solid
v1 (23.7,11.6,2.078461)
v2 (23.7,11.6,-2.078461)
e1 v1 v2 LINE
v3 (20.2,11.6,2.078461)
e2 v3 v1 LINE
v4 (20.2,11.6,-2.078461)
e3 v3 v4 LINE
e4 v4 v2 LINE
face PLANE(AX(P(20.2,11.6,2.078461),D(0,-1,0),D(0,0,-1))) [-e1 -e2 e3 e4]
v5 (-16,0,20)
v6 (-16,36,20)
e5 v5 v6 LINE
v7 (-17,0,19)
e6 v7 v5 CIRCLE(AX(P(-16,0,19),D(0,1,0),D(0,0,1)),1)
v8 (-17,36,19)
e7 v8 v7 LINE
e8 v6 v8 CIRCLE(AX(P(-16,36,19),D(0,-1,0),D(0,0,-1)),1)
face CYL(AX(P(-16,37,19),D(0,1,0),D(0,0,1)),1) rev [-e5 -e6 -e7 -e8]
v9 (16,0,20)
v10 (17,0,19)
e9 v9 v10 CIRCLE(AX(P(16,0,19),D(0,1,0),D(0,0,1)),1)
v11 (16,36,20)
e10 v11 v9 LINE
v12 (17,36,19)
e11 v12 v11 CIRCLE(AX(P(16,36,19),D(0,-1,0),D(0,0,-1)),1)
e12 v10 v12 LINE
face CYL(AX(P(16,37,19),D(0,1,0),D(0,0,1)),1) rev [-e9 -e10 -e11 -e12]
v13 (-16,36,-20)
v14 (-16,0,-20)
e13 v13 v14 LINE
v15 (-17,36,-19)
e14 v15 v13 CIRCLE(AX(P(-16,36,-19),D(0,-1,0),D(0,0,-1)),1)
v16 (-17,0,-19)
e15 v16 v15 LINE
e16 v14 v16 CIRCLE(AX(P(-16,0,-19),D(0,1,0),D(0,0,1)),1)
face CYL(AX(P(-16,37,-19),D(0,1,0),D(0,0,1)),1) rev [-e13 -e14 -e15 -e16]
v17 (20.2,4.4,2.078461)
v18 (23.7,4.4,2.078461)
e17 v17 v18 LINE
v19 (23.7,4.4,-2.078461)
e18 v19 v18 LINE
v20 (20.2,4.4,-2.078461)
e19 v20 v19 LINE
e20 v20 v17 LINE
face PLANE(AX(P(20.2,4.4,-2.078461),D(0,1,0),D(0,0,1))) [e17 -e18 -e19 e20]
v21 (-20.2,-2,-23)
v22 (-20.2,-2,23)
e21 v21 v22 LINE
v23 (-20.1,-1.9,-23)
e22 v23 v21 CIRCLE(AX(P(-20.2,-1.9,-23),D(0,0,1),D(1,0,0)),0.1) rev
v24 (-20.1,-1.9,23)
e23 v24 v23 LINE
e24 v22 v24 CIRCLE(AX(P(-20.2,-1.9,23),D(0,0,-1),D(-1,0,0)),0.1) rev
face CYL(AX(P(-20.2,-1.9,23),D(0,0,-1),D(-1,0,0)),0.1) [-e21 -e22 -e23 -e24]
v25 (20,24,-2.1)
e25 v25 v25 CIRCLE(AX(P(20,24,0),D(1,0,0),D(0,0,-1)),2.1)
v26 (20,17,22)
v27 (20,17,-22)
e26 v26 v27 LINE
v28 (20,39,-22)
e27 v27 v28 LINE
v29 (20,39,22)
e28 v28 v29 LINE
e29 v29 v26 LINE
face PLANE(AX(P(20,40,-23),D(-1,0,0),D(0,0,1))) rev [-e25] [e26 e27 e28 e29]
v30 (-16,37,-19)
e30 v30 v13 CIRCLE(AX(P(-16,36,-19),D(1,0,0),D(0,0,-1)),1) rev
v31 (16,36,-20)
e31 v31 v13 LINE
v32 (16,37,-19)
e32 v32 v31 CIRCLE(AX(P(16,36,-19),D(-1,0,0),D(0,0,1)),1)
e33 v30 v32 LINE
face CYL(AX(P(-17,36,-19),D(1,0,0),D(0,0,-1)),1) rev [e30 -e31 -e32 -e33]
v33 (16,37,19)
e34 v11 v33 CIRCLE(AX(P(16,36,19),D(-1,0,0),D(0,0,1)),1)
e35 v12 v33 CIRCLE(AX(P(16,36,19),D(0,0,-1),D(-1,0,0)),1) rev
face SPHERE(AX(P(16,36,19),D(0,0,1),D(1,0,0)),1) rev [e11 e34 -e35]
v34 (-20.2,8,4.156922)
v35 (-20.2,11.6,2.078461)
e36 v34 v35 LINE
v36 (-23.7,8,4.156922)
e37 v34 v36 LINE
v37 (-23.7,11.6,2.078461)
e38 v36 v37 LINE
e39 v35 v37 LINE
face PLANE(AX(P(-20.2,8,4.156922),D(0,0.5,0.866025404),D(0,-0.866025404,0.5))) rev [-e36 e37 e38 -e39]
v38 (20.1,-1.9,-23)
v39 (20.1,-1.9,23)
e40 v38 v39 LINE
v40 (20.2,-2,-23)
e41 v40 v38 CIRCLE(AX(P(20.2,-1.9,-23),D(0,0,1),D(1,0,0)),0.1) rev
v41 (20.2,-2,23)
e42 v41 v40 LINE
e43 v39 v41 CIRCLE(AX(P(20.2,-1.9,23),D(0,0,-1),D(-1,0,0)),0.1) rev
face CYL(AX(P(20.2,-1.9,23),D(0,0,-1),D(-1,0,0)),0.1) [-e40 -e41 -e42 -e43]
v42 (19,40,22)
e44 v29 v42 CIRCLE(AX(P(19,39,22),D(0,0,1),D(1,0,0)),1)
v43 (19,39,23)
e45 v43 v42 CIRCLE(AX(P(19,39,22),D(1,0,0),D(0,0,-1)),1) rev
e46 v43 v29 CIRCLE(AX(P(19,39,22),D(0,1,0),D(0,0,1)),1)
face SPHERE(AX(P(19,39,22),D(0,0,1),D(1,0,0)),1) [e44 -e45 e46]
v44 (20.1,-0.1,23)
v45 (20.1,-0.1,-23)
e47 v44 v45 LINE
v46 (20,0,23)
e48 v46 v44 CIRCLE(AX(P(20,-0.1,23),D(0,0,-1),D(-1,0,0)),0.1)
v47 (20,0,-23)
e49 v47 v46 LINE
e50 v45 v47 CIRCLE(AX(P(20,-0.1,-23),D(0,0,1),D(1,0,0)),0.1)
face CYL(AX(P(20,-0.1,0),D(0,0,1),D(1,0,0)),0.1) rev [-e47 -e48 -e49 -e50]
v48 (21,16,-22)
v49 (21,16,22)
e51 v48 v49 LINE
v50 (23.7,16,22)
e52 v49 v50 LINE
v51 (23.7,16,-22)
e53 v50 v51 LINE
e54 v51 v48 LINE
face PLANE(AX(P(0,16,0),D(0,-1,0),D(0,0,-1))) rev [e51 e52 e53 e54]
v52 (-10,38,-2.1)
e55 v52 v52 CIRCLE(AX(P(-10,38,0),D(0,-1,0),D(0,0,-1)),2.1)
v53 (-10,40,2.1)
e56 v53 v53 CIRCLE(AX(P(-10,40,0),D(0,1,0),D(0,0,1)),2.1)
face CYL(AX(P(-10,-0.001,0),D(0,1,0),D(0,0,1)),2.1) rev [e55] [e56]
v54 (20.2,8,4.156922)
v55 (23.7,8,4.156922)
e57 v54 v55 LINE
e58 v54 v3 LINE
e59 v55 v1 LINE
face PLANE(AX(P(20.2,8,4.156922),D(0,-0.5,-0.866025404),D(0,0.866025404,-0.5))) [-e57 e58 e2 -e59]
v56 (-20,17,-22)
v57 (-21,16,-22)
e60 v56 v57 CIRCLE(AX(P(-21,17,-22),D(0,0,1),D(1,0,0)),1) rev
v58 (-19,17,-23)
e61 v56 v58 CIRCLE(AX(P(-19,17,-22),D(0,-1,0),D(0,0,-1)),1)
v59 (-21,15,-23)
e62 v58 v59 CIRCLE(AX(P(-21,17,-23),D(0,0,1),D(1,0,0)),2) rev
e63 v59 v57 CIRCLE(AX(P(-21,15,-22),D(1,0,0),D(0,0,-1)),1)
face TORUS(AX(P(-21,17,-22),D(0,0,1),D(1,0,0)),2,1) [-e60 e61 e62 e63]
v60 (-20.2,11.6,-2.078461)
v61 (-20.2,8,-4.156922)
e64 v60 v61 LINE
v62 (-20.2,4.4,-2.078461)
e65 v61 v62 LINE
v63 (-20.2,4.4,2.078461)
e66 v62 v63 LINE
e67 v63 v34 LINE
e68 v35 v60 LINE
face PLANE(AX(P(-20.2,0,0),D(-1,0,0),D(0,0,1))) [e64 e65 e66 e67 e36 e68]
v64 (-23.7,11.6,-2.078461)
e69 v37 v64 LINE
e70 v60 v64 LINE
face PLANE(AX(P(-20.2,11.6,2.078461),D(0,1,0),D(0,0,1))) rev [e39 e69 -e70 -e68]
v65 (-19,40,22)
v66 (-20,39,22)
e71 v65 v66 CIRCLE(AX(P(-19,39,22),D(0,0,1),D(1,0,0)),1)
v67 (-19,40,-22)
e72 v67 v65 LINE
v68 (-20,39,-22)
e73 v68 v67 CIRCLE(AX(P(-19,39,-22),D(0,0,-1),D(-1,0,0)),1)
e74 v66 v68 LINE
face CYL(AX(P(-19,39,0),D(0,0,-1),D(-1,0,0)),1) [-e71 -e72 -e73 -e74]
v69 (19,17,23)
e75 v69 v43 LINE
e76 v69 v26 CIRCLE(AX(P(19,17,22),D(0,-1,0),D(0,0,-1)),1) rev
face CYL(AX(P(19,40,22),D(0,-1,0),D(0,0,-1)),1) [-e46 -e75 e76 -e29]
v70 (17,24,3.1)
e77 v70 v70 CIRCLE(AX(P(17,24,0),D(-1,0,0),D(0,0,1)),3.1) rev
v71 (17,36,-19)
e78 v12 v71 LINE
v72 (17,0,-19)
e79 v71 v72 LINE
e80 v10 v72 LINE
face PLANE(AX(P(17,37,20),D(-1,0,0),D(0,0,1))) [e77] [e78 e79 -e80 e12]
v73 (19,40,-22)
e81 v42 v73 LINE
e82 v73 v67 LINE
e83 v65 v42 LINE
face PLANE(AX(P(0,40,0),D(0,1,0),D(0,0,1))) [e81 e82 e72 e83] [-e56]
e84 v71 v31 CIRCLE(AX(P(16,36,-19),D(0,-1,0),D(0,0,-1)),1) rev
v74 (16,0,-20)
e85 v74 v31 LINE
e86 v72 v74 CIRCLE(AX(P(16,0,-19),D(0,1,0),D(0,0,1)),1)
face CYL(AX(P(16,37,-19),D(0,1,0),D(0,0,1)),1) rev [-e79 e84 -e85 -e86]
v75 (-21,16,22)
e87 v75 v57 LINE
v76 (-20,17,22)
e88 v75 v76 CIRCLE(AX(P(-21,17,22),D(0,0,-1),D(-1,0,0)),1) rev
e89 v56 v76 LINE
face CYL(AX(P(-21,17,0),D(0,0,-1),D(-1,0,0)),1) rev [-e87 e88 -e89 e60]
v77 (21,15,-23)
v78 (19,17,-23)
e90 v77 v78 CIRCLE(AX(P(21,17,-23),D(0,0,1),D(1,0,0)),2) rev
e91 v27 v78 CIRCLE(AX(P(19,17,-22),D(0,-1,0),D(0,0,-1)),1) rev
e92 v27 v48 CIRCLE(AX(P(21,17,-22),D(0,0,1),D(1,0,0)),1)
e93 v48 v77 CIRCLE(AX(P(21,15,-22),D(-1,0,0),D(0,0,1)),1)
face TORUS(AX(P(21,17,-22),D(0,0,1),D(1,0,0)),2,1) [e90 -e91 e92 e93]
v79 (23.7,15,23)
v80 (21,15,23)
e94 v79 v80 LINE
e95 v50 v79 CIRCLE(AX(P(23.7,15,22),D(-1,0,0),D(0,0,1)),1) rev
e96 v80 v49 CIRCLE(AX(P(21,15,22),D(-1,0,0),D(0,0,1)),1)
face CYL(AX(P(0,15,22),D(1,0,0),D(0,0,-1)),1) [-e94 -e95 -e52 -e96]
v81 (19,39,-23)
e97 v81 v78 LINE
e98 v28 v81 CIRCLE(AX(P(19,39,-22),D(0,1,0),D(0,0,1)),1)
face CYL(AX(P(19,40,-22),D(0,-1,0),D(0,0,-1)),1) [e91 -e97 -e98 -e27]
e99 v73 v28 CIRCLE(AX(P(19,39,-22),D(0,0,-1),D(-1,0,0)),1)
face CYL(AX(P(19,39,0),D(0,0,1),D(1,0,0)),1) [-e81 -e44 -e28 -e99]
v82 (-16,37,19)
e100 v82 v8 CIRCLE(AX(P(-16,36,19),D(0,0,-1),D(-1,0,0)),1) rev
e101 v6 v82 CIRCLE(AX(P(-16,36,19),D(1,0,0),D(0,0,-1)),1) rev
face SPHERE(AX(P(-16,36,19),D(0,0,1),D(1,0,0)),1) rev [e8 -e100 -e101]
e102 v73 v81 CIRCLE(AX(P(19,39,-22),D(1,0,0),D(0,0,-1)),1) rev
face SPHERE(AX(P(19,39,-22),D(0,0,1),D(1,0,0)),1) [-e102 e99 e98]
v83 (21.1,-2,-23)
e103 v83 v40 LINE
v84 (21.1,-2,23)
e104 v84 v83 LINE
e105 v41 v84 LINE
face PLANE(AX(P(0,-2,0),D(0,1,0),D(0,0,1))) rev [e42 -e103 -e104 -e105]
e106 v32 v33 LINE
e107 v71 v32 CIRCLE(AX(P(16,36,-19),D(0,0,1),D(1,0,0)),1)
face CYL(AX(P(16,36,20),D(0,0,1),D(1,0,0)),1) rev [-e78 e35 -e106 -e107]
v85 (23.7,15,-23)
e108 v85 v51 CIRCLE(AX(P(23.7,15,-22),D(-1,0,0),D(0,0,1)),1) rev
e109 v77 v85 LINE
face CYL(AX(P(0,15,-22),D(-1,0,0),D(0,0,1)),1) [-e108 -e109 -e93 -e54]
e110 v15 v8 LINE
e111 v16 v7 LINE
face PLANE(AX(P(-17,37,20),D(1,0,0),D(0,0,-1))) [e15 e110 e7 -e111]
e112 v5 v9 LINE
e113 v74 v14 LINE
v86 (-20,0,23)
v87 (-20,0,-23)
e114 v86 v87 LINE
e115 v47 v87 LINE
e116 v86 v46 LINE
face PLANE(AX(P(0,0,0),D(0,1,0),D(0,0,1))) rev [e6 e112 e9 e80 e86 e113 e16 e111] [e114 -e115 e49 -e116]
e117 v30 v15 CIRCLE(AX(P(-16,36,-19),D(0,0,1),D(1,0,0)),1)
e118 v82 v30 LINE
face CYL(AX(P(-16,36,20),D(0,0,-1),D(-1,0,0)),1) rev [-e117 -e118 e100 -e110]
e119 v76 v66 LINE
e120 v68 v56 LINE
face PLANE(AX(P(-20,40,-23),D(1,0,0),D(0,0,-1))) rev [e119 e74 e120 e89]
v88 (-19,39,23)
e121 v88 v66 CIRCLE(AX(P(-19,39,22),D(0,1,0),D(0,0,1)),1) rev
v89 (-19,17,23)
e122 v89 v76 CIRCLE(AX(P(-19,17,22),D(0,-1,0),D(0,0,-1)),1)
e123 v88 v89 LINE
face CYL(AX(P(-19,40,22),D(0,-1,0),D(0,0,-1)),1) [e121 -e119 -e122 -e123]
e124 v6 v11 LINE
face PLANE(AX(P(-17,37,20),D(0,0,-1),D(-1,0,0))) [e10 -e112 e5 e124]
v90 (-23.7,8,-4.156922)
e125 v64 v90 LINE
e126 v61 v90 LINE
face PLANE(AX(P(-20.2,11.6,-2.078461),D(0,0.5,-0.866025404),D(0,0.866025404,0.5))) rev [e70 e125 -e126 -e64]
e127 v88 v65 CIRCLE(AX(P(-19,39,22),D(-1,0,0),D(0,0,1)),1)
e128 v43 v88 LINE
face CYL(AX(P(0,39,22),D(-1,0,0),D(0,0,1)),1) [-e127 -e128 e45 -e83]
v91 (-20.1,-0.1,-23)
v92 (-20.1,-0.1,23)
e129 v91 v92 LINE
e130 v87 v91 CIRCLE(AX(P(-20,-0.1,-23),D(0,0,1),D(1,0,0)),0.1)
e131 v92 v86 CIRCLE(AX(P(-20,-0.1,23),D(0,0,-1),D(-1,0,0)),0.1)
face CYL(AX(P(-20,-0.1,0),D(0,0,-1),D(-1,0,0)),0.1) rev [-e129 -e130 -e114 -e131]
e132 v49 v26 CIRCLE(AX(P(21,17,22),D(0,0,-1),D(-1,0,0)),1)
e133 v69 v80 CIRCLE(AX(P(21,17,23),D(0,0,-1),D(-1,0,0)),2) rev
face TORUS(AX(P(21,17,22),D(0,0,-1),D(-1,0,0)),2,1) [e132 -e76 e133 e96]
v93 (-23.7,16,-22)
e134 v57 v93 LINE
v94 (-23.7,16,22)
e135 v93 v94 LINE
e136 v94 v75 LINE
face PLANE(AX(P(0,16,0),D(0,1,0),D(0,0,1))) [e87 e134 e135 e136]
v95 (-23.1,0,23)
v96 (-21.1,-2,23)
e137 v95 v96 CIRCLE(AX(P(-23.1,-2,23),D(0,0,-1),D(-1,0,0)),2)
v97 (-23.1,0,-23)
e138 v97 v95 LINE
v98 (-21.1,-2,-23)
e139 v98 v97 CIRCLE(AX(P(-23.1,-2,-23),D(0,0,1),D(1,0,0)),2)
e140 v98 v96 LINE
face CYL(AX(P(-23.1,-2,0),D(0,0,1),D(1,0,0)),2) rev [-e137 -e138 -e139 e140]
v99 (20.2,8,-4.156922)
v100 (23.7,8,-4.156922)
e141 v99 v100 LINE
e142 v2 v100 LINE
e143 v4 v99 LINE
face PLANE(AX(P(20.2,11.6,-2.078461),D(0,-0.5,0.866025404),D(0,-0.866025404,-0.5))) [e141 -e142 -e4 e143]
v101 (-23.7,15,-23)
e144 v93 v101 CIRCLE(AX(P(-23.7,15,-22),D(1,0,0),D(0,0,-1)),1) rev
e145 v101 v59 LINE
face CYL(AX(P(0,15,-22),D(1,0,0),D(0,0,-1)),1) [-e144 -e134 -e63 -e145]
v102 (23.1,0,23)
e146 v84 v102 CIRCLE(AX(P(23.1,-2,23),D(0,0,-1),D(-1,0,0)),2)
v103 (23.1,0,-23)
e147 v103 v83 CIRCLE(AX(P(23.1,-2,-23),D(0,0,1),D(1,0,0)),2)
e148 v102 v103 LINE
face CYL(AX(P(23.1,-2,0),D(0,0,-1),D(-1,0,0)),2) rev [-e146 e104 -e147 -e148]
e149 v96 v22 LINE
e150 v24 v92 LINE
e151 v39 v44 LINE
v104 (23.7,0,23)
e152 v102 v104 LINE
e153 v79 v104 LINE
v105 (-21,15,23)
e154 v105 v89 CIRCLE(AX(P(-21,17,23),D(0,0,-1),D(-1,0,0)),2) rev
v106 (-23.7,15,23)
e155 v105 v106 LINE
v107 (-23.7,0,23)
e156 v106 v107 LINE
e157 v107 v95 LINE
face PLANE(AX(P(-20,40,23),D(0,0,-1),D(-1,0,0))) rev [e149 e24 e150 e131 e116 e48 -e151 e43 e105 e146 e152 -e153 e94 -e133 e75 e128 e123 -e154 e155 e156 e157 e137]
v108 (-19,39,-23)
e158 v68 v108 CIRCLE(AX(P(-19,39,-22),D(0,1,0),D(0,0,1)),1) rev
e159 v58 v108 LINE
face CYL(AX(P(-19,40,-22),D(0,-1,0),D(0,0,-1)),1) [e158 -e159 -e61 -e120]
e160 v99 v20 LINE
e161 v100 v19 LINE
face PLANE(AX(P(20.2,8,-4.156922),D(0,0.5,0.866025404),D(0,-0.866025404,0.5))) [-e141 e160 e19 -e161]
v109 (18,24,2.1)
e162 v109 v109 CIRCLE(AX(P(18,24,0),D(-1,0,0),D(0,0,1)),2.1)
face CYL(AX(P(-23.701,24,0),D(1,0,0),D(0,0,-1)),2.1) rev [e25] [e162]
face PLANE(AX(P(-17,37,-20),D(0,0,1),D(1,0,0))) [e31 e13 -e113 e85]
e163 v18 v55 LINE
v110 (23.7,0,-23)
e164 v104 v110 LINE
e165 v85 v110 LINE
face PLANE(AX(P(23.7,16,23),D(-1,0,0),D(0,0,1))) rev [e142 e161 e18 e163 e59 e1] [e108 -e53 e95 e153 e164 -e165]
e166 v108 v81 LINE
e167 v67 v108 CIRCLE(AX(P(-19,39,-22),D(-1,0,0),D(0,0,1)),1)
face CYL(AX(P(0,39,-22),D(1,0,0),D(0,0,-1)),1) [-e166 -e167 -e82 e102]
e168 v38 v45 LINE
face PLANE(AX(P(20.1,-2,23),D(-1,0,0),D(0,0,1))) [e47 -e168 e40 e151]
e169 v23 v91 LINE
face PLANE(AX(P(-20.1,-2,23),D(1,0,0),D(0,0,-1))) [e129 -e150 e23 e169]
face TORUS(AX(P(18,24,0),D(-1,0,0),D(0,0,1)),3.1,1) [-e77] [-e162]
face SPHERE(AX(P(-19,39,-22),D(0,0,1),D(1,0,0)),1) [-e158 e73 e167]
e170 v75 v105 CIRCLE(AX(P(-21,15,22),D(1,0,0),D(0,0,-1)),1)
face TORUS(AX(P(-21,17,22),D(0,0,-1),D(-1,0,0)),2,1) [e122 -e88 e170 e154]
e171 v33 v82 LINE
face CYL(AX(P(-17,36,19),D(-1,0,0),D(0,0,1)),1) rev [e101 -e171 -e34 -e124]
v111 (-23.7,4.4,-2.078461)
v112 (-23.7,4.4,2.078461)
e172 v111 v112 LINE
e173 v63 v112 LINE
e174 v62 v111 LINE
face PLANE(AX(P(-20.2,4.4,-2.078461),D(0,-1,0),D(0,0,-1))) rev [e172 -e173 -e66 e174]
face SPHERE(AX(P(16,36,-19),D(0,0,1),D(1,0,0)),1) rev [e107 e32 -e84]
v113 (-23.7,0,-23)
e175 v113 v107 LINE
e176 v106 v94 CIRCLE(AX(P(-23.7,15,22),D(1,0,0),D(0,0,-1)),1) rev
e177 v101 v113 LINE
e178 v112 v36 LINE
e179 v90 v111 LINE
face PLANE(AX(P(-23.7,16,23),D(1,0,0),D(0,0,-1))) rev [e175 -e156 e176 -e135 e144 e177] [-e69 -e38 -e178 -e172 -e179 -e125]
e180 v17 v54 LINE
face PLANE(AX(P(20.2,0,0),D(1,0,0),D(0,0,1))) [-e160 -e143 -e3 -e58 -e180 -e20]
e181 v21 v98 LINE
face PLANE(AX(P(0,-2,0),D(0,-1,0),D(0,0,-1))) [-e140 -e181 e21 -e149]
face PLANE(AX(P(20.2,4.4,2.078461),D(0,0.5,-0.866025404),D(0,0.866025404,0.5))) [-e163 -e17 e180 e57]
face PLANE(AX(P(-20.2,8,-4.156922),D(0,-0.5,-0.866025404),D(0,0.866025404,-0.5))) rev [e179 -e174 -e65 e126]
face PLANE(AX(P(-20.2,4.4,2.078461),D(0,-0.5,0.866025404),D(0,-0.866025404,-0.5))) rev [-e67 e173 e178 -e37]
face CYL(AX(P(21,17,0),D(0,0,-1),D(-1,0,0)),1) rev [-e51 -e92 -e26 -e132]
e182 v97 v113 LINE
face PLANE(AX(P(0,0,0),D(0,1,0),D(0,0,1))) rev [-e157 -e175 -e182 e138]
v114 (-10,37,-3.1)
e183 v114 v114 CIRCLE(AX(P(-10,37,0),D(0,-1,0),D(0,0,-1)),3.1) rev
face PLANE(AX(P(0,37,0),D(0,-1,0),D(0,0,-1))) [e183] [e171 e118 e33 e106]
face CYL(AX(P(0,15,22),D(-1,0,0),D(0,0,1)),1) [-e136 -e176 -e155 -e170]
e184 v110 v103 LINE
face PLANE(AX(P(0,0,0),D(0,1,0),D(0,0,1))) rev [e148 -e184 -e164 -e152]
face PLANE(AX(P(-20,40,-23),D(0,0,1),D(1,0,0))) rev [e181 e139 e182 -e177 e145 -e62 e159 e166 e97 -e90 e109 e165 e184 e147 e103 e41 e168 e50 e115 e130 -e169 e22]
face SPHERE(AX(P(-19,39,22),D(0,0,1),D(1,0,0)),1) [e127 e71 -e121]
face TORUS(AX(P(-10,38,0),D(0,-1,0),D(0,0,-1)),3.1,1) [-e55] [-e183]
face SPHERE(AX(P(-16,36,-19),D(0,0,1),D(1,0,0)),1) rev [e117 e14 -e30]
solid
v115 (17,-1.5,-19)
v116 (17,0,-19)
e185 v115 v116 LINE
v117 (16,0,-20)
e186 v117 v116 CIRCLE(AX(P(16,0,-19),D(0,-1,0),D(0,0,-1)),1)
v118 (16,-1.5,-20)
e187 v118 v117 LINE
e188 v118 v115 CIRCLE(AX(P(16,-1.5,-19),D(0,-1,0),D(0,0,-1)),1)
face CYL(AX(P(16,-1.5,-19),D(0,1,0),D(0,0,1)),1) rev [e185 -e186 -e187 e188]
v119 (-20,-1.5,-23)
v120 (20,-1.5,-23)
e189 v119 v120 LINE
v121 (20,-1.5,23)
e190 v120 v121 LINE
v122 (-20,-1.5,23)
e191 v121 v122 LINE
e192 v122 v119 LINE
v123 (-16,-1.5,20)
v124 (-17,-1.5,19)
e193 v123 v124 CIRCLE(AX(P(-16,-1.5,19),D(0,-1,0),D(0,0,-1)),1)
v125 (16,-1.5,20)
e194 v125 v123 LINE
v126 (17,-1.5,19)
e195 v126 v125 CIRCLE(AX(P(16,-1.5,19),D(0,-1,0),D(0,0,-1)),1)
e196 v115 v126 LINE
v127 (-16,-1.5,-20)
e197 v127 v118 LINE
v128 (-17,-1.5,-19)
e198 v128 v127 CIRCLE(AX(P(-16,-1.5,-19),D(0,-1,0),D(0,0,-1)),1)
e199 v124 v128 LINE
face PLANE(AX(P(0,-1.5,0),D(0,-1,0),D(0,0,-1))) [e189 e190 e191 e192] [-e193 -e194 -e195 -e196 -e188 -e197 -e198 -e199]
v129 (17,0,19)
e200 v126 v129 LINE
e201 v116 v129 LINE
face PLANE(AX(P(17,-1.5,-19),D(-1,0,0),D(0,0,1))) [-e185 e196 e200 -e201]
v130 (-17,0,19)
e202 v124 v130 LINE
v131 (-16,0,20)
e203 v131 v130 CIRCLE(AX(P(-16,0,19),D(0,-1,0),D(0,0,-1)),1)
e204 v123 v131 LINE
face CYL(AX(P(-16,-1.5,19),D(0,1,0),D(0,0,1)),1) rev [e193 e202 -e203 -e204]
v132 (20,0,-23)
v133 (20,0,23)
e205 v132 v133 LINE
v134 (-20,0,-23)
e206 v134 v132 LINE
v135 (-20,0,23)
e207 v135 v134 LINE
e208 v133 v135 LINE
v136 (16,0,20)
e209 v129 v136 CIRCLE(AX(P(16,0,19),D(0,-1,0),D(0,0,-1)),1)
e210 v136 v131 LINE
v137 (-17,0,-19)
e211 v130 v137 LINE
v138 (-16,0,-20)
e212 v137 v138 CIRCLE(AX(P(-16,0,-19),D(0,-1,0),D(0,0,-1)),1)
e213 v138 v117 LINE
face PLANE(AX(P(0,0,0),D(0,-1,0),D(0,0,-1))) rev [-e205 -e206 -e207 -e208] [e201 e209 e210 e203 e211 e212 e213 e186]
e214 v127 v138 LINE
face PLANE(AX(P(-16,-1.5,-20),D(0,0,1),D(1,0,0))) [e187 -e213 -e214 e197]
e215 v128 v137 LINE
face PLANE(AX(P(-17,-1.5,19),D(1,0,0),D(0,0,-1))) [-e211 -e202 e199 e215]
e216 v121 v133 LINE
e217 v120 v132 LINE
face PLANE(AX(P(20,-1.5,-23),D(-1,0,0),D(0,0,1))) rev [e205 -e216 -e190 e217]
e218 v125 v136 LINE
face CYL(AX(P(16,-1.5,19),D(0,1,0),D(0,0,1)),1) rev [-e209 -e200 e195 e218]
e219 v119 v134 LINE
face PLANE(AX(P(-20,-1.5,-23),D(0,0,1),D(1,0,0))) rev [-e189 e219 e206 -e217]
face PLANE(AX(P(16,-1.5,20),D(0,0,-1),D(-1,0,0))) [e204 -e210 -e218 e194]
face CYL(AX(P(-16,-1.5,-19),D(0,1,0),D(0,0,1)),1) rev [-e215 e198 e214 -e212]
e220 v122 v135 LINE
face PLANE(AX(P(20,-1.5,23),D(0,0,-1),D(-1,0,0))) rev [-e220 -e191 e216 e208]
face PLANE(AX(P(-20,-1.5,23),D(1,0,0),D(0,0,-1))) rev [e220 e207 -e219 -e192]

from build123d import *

# Parameters (mm, degrees)
SKETCH1_W               = 40
SKETCH1_H               = 46
BODY_DEPTH              = 40
SKETCH2_W               = 3.7
SKETCH2_H               = 46
EXTENSION_DEPTH         = 16
SKETCH5_W               = 34
SKETCH5_H               = 40
CAVITY_DEPTH            = 37
TOP_HOLE_REACH          = 53.872
SKETCH6_R               = 2.1
SIDE_HOLE_REACH         = 65.551
SKETCH7_R               = 2.1
SKETCH3_W               = 1
SKETCH3_H               = 46
LEGS_DEPTH              = 2
MOUNT_COUNTERBORE_DEPTH = 3.5
F_2MM_LEG_FILLET_R      = 2
F_0_1MM_LEG_FILLET_R    = 0.1
OUTER_BOUNDARY_FILLET_R = 1
INNER_BOUNDARY_FILLET_R = 1
SKETCH8_W               = 40
SKETCH8_H               = 46
BOSS_EXTRUDE1_DEPTH     = 1.5


with BuildPart() as part:
    # Sketch1 → Body (new body)
    with BuildSketch(Plane(origin=(0, 0, 0), x_dir=(1, 0, 0), z_dir=(0, 1, 0))):
        Rectangle(SKETCH1_W, SKETCH1_H)
    extrude(amount=BODY_DEPTH)

    # Sketch2 → Extension (add)
    with BuildSketch(Plane(origin=(0, 0, 0), x_dir=(1, 0, 0), z_dir=(0, 1, 0))):
        with Locations((-21.85, 0)):
            Rectangle(SKETCH2_W, SKETCH2_H)
        with Locations((21.85, 0)):
            Rectangle(SKETCH2_W, SKETCH2_H)
    extrude(amount=EXTENSION_DEPTH)

    # Sketch5 → Cavity (cut)
    with BuildSketch(Plane(origin=(0, 0, 0), x_dir=(1, 0, 0), z_dir=(0, 1, 0))):
        Rectangle(SKETCH5_W, SKETCH5_H)
    extrude(amount=CAVITY_DEPTH, mode=Mode.SUBTRACT)

    # Sketch6 → Top Hole (cut, up to next)
    with BuildSketch(Plane(origin=(0, 40, 0), x_dir=(1, 0, 0), z_dir=(0, 1, 0)), mode=Mode.PRIVATE) as top_hole_sk1:
        with Locations(Location((-10, 0, 0), (0, 0, 270))):
            Circle(SKETCH6_R)
    top_hole_tool1 = extrude(top_hole_sk1.sketch, amount=-TOP_HOLE_REACH, mode=Mode.PRIVATE) & part.part
    add(top_hole_tool1.solids().sort_by_distance((-10, 40, 0))[0], mode=Mode.SUBTRACT)

    # Sketch7 → Side Hole (cut, up to next)
    with BuildSketch(Plane(origin=(20, 0, 0), x_dir=(0, 0, -1), z_dir=(1, 0, 0)), mode=Mode.PRIVATE) as side_hole_sk1:
        with Locations((0, 24)):
            Circle(SKETCH7_R)
    side_hole_tool1 = extrude(side_hole_sk1.sketch, amount=-SIDE_HOLE_REACH, mode=Mode.PRIVATE) & part.part
    add(side_hole_tool1.solids().sort_by_distance((20, 24, 0))[0], mode=Mode.SUBTRACT)

    # Sketch3 → Legs (add)
    with BuildSketch(Plane(origin=(0, 0, 0), x_dir=(1, 0, 0), z_dir=(0, 1, 0))):
        with Locations((-20.6, 0)):
            Rectangle(SKETCH3_W, SKETCH3_H)
        with Locations((20.6, 0)):
            Rectangle(SKETCH3_W, SKETCH3_H)
    extrude(amount=-LEGS_DEPTH)

    # Sketch4 → Mount Counterbore (cut)
    with BuildSketch(Plane.ZY.offset(23.7)):
        Polygon((2.078460969, 11.6), (-2.078460969, 11.6), (-4.156921938, 8), (-2.078460969, 4.4), (2.078460969, 4.4), (4.156921938, 8), align=None)
    mount_counterbore = extrude(amount=-MOUNT_COUNTERBORE_DEPTH, mode=Mode.SUBTRACT)

    # Mount Counterbore Mirror: Mount Counterbore across plane
    add(mount_counterbore.mirror(Plane(origin=(0, 0, 0), x_dir=(0, 0, 1), z_dir=(1, 0, 0))), mode=Mode.SUBTRACT)

    # 2mm Leg Fillet
    f_2mm_leg_fillet_edges = [part.edges().sort_by_distance(p)[0] for p in [
        (21.1, 0, 0),
        (-21.1, 0, 0),
    ]]
    fillet(f_2mm_leg_fillet_edges, radius=F_2MM_LEG_FILLET_R - 0.0001)  # a hair under: the kernel refuses the full size

    # 0.1mm Leg Fillet
    f_0_1mm_leg_fillet_edges = [part.edges().sort_by_distance(p)[0] for p in [
        (-20.1, -2, 0),
        (-20.1, 0, 0),
        (20.1, -2, 0),
        (20.1, 0, 0),
    ]]
    fillet(f_0_1mm_leg_fillet_edges, radius=F_0_1MM_LEG_FILLET_R)

    # Outer Boundary Fillet
    outer_boundary_fillet_edges = [part.edges().sort_by_distance(p)[0] for p in [
        (20, 40, 0),
        (-20, 16, 0),
        (-21.85, 16, -23),
        (0, 40, -23),
        (-21.85, 16, 23),
        (20, 16, 0),
        (21.85, 16, 23),
        (21.85, 16, -23),
        (-20, 40, 0),
        (-20, 28, -23),
        (20, 28, -23),
        (20, 28, 23),
        (-20, 28, 23),
        (0, 40, 23),
    ]]
    fillet(outer_boundary_fillet_edges, radius=OUTER_BOUNDARY_FILLET_R)

    # Inner Boundary Fillet
    inner_boundary_fillet_edges = [part.edges().sort_by_distance(p)[0] for p in [
        (-17, 18.5, -20),
        (-17, 18.5, 20),
        (17, 18.5, 20),
        (17, 18.5, -20),
        (-17, 37, 0),
        (0, 37, 20),
        (17, 37, 0),
        (0, 37, -20),
        (-10, 37, -2.1),
        (17, 24, 2.1),
    ]]
    fillet(inner_boundary_fillet_edges, radius=INNER_BOUNDARY_FILLET_R)


with BuildPart() as body_2:
    # Sketch8 → Boss-Extrude1 (new body)
    with BuildSketch(Plane.XZ):
        Rectangle(SKETCH8_W, SKETCH8_H)
        with BuildLine():
            Line((-16, -20), (16, -20))
            ThreePointArc((16, -20), (16.707106781, -19.707106781), (17, -19))
            Line((17, -19), (17, 19))
            ThreePointArc((17, 19), (16.707106781, 19.707106781), (16, 20))
            Line((16, 20), (-16, 20))
            ThreePointArc((-16, 20), (-16.707106781, 19.707106781), (-17, 19))
            Line((-17, 19), (-17, -19))
            ThreePointArc((-17, -19), (-16.707106781, -19.707106781), (-16, -20))
        make_face(mode=Mode.SUBTRACT)
    extrude(amount=BOSS_EXTRUDE1_DEPTH)


solid = Compound([part.part, body_2.part])
